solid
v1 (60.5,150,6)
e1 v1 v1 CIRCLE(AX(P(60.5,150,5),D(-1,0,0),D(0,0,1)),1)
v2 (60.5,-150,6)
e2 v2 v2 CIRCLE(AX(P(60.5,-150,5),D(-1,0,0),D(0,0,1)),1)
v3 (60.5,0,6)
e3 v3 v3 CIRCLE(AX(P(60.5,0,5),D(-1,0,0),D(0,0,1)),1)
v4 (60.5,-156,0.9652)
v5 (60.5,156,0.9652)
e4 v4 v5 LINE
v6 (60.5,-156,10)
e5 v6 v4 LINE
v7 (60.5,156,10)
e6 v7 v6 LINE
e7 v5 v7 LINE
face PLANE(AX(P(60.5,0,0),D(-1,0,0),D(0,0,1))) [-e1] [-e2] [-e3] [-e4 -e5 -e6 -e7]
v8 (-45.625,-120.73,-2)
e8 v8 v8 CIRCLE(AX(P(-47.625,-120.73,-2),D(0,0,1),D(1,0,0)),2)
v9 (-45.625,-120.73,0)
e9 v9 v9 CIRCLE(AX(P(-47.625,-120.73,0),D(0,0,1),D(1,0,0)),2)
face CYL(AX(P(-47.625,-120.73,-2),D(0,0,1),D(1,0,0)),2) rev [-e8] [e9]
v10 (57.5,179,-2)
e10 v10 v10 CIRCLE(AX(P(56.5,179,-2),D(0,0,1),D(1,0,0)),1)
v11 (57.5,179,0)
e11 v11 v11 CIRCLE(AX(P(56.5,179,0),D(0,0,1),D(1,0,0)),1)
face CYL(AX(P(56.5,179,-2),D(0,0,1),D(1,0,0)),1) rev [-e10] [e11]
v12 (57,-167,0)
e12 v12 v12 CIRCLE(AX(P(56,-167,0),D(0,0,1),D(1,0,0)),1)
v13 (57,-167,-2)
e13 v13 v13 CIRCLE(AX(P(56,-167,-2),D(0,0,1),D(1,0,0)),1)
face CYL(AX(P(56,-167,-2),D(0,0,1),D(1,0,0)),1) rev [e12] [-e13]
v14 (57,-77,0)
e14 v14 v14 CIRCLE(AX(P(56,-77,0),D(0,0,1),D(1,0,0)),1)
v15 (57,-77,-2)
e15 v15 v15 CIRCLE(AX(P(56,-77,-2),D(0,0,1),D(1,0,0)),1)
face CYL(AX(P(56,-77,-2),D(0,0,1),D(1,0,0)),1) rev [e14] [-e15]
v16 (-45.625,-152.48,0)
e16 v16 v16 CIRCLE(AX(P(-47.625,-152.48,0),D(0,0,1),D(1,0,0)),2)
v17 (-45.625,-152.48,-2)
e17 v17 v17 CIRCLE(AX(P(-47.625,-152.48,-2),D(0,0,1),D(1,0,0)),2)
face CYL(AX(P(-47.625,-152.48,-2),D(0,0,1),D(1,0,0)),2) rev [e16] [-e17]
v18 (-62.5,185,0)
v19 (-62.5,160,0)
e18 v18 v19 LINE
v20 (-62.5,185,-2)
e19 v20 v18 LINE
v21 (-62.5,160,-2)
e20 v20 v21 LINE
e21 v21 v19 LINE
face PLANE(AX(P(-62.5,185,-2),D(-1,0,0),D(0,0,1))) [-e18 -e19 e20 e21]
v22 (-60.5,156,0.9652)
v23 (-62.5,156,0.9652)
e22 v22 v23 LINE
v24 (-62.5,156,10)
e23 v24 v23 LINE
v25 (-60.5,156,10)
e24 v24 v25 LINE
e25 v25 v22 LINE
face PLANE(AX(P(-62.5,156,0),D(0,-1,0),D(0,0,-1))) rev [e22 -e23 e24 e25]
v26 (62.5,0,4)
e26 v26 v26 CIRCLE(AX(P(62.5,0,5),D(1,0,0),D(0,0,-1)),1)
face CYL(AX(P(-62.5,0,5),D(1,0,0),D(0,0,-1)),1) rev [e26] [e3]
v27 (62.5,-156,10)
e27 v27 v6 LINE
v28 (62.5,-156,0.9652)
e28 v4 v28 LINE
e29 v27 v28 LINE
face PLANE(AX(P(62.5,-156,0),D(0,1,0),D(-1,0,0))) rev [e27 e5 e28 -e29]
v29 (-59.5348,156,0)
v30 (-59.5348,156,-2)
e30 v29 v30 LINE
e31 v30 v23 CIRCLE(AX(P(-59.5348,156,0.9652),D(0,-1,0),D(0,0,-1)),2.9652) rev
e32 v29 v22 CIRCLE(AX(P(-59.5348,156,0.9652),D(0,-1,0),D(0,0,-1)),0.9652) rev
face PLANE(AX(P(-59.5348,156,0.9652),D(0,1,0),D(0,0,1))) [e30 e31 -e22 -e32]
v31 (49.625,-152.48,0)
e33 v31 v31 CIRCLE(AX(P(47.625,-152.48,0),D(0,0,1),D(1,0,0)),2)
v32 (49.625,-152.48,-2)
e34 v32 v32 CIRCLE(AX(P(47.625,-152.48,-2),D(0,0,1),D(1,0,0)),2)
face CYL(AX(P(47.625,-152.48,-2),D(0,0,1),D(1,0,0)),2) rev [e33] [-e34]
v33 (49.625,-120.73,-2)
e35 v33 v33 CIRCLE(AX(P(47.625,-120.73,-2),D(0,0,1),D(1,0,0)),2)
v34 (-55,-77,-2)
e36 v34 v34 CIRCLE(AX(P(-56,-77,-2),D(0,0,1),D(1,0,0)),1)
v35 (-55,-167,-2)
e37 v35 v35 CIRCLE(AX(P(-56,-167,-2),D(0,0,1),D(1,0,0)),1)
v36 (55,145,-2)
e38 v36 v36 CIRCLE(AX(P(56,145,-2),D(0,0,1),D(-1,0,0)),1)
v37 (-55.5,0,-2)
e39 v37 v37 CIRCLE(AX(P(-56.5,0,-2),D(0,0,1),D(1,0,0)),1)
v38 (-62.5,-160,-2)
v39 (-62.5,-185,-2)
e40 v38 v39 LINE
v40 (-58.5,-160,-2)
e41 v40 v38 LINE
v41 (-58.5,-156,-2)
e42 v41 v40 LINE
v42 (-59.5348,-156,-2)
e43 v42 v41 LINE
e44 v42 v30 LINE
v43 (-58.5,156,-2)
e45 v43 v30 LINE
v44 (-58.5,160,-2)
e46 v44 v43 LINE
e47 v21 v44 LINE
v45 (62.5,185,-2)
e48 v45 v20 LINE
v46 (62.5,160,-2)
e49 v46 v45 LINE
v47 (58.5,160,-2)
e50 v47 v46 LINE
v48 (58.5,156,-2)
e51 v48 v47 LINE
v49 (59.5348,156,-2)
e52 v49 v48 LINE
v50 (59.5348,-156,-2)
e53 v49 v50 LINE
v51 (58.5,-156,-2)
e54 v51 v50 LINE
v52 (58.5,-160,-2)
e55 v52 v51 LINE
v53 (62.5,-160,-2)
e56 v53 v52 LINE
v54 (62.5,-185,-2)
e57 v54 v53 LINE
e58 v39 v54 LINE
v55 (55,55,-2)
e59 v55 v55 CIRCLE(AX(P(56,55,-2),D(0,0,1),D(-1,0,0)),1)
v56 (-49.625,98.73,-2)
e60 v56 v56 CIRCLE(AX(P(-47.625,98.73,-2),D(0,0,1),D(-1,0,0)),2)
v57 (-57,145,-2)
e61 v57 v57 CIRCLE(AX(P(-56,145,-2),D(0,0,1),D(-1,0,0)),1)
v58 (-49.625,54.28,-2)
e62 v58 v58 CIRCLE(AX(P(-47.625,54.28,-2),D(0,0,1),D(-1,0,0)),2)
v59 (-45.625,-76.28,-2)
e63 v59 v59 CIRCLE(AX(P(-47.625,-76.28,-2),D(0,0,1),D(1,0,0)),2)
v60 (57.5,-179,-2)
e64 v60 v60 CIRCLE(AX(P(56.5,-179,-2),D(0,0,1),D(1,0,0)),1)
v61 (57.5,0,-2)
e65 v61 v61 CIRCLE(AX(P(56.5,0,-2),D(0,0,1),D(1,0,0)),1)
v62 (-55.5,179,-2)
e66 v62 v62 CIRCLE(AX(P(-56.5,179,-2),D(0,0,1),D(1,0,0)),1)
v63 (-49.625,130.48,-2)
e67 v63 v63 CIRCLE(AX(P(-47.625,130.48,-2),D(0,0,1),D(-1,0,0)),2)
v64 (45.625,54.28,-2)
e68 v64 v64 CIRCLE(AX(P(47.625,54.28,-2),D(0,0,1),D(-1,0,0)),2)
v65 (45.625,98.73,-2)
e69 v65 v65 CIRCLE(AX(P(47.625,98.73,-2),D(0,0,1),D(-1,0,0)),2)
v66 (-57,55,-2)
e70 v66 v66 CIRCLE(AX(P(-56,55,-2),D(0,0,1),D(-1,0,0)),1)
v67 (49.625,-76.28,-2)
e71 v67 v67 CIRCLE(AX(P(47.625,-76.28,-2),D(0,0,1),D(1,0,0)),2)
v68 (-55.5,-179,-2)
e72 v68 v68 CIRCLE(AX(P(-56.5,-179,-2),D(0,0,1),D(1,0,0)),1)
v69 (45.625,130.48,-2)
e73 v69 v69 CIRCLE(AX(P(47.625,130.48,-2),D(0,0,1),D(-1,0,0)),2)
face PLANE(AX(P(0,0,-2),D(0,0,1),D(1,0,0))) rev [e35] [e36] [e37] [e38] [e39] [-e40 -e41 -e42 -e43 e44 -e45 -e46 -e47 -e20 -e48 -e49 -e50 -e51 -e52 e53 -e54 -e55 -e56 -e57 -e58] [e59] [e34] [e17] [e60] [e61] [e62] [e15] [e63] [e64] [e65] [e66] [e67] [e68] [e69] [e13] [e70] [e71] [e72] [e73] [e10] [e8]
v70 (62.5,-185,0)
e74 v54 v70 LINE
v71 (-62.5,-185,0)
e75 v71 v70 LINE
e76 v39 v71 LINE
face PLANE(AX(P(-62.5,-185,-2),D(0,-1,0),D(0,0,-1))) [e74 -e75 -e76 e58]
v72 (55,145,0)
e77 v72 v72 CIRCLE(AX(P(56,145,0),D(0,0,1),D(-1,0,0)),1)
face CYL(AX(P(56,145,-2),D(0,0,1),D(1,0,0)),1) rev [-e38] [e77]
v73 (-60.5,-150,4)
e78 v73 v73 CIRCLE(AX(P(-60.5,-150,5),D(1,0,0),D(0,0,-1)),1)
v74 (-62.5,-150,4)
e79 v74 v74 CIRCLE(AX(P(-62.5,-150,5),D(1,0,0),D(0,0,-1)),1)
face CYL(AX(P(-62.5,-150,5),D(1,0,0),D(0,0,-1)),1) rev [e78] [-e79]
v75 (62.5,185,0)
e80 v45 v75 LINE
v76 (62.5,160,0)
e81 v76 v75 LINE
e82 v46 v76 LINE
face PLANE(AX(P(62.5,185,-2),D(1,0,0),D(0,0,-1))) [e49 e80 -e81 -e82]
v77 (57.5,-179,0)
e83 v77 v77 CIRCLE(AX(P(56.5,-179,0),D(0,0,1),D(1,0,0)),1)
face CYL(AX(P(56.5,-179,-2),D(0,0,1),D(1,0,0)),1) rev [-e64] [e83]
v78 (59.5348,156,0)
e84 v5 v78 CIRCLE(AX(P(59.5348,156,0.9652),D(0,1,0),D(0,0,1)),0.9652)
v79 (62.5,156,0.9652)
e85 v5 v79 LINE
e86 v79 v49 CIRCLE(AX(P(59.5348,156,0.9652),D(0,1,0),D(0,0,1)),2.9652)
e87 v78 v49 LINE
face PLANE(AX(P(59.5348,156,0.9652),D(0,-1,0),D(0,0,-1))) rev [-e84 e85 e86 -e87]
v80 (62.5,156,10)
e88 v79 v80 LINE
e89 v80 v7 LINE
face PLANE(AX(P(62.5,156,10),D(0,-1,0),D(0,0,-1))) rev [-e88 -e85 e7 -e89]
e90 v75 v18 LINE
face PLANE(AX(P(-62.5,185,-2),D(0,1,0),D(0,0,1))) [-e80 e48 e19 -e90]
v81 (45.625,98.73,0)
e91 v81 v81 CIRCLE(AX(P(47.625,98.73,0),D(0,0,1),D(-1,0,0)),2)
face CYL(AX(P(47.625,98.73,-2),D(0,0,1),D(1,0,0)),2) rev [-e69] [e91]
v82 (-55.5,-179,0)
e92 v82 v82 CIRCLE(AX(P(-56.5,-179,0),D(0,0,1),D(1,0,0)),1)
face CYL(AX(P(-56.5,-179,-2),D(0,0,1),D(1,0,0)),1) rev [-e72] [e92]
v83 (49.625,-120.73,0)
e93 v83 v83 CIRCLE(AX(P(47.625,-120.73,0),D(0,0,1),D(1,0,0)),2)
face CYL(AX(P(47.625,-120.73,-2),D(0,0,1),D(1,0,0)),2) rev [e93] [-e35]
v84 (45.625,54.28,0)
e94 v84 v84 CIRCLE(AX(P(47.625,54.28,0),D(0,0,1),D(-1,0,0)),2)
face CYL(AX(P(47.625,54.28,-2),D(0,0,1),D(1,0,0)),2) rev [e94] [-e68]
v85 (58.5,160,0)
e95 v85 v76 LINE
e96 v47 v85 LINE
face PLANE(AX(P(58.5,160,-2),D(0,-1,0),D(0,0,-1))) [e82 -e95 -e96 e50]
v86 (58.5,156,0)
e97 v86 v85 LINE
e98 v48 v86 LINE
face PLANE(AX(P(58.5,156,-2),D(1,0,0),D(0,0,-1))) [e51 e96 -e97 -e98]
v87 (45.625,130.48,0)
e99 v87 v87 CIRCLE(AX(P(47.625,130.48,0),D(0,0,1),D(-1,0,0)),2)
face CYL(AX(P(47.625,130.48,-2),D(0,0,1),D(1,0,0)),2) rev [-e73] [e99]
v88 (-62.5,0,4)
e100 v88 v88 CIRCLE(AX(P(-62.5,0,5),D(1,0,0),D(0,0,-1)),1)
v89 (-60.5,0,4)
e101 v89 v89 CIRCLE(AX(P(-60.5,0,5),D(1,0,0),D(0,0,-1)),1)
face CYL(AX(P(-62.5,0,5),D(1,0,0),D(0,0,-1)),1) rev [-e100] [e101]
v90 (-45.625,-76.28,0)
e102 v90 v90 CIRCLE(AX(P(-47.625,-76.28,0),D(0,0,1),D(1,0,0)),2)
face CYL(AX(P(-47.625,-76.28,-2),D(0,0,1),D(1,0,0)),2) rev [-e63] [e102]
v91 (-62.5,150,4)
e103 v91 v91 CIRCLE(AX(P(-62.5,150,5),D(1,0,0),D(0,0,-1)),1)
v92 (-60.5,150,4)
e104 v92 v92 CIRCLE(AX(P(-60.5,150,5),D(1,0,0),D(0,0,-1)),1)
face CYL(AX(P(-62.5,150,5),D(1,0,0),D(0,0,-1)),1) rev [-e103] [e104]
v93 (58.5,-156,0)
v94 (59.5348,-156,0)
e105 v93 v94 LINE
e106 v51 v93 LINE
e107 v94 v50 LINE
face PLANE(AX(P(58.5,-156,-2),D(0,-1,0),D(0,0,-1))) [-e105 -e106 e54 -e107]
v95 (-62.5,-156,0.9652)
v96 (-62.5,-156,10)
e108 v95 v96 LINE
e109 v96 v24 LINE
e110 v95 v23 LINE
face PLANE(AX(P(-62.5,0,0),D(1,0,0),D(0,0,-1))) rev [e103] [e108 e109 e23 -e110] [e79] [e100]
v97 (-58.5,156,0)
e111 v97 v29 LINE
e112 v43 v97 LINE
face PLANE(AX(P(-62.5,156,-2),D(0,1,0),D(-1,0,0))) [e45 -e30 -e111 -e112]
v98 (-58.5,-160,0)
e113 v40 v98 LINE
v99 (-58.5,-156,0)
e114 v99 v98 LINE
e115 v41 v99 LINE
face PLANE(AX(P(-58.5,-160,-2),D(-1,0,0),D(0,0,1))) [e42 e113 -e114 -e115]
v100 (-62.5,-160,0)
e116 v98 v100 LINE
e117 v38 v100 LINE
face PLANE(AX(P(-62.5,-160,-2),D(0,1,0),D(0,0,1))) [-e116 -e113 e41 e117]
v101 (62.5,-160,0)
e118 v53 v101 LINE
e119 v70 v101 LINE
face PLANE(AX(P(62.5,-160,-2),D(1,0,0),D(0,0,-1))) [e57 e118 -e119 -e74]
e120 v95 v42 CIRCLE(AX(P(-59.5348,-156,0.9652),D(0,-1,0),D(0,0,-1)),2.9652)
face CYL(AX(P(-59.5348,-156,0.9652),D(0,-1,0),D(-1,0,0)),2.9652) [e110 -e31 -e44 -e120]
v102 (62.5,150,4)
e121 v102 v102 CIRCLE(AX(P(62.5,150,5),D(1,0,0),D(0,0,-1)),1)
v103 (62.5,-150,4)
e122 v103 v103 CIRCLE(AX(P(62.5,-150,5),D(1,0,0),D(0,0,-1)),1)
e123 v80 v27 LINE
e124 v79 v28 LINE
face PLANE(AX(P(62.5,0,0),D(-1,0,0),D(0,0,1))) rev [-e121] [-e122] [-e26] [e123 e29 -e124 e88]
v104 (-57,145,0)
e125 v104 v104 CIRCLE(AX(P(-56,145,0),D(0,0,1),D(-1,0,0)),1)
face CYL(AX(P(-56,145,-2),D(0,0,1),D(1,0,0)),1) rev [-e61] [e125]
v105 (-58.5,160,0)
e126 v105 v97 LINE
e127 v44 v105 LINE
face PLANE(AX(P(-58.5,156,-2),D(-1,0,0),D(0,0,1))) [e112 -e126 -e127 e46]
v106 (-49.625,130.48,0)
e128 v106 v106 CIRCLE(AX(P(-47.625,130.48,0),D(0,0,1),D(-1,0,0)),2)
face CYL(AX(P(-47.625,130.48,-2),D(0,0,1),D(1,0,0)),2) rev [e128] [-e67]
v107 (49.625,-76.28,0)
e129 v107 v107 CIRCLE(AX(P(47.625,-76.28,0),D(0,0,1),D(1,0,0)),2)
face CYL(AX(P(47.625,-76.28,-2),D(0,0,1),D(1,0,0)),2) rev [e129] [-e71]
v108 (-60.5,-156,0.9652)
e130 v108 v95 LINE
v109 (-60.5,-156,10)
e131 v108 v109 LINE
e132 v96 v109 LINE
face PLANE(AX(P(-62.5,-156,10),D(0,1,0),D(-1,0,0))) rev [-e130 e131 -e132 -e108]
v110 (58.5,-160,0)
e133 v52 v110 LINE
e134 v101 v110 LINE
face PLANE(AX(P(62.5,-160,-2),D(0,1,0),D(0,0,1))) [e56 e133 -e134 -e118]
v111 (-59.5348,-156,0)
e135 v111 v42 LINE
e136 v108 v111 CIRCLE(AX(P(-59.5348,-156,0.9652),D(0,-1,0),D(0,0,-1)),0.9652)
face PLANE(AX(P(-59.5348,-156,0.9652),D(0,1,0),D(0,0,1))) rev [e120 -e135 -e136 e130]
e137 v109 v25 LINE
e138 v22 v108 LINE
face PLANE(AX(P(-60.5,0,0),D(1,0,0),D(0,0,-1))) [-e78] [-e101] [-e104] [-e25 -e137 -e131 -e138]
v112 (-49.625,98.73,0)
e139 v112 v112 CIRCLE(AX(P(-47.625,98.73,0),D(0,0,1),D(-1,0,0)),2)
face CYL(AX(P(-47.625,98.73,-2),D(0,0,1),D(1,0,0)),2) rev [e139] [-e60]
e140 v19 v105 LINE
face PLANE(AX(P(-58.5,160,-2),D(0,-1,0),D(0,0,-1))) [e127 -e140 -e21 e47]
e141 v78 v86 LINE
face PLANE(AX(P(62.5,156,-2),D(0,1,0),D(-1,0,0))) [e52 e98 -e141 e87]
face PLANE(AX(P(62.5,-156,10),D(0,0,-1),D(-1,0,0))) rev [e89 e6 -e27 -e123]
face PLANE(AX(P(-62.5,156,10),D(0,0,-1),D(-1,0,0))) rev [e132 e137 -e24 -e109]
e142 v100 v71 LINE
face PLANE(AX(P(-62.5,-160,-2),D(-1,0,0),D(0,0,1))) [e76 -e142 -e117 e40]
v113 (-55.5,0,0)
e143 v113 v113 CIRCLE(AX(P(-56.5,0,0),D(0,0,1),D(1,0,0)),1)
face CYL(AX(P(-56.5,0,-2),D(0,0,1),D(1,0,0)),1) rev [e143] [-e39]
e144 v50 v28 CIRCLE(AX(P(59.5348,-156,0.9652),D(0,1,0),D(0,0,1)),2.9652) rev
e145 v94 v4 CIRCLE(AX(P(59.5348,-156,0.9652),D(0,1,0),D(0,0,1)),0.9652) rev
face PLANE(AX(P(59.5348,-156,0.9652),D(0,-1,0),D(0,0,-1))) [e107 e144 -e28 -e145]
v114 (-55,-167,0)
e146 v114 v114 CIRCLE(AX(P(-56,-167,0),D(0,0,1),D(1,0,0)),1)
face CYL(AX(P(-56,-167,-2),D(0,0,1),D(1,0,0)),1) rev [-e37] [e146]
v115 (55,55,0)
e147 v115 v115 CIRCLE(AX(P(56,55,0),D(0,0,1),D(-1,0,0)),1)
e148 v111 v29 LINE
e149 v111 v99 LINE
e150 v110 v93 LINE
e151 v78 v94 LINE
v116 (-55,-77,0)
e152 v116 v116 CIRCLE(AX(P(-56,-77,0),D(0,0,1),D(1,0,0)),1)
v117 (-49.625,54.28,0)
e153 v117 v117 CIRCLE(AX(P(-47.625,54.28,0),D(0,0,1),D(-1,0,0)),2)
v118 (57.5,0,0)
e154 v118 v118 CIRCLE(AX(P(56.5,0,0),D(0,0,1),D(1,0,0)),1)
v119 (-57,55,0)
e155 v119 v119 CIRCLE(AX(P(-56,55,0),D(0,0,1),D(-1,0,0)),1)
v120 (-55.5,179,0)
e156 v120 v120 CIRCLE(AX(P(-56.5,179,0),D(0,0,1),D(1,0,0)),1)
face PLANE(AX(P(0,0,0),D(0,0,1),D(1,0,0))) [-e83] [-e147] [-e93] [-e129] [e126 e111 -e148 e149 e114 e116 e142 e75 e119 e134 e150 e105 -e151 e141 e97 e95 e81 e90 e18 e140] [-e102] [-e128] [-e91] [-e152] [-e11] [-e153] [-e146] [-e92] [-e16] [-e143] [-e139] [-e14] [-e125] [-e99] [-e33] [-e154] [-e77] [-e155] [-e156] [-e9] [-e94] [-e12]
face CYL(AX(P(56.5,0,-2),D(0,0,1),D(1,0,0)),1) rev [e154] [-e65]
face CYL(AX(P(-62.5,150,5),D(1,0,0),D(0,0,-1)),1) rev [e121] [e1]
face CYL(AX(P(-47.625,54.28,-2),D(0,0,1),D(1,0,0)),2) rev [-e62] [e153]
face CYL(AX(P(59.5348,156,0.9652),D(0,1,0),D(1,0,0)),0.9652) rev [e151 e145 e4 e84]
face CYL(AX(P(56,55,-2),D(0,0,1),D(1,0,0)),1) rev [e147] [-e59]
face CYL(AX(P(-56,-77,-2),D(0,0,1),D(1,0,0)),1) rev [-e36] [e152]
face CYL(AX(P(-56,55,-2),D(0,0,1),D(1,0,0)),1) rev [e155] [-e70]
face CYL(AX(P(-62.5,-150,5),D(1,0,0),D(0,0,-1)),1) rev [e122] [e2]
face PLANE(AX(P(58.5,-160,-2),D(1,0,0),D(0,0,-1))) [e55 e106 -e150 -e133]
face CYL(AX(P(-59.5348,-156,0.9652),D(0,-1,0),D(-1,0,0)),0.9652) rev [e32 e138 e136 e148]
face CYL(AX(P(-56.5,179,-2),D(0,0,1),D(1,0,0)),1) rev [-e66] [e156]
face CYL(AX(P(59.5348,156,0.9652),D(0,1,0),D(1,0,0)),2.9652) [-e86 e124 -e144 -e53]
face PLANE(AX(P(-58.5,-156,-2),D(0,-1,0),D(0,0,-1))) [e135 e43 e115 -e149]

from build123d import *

# Parameters (mm, degrees)
SKETCH1_R                      = 2
SKETCH1_R_2                    = 1
BASE_FLANGE1_DEPTH             = 2
EDGE_FLANGE1_STRIP_W           = 9.9304
EDGE_FLANGE1_STRIP_H           = 2
EDGE_FLANGE1_STRIP_CUT_DEPTH   = 312
EDGE_FLANGE1_STRIP_2_W         = 9.9304
EDGE_FLANGE1_STRIP_2_H         = 2
EDGE_FLANGE1_STRIP_CUT_2_DEPTH = 312
EDGE_FLANGE1_DEPTH             = 312
EDGE_FLANGE1_BEND_DEPTH        = 312
SKETCH13_R                     = 1
CUT_EXTRUDE1_DEPTH             = 224.494966386


# Sheet-metal steps are written as plain solids
with BuildPart() as part:
    # Sketch1 → Base-Flange1 (new body)
    with BuildSketch(Plane(origin=(0, 0, 0), x_dir=(0, 1, 0), z_dir=(0, 0, 1))):
        Polygon((185, 62.5), (160, 62.5), (160, 58.5), (156, 58.5), (156, 62.5), (-156, 62.5), (-156, 58.5), (-160, 58.5), (-160, 62.5), (-185, 62.5), (-185, -62.5), (-160, -62.5), (-160, -58.5), (-156, -58.5), (-156, -62.5), (156, -62.5), (156, -58.5), (160, -58.5), (160, -62.5), (185, -62.5), align=None)
        with Locations(Location((-152.48, 47.625, 0), (0, 0, 270))):
            Circle(SKETCH1_R, mode=Mode.SUBTRACT)
        with Locations(Location((-120.73, 47.625, 0), (0, 0, 270))):
            Circle(SKETCH1_R, mode=Mode.SUBTRACT)
        with Locations(Location((-76.28, 47.625, 0), (0, 0, 270))):
            Circle(SKETCH1_R, mode=Mode.SUBTRACT)
        with Locations(Location((-152.48, -47.625, 0), (0, 0, 270))):
            Circle(SKETCH1_R, mode=Mode.SUBTRACT)
        with Locations(Location((-120.73, -47.625, 0), (0, 0, 270))):
            Circle(SKETCH1_R, mode=Mode.SUBTRACT)
        with Locations(Location((-76.28, -47.625, 0), (0, 0, 270))):
            Circle(SKETCH1_R, mode=Mode.SUBTRACT)
        with Locations(Location((54.28, 47.625, 0), (0, 0, 90))):
            Circle(SKETCH1_R, mode=Mode.SUBTRACT)
        with Locations(Location((98.73, 47.625, 0), (0, 0, 90))):
            Circle(SKETCH1_R, mode=Mode.SUBTRACT)
        with Locations(Location((130.48, 47.625, 0), (0, 0, 90))):
            Circle(SKETCH1_R, mode=Mode.SUBTRACT)
        with Locations(Location((130.48, -47.625, 0), (0, 0, 90))):
            Circle(SKETCH1_R, mode=Mode.SUBTRACT)
        with Locations(Location((98.73, -47.625, 0), (0, 0, 90))):
            Circle(SKETCH1_R, mode=Mode.SUBTRACT)
        with Locations(Location((54.28, -47.625, 0), (0, 0, 90))):
            Circle(SKETCH1_R, mode=Mode.SUBTRACT)
        with Locations(Location((-179, 56.5, 0), (0, 0, 270))):
            Circle(SKETCH1_R_2, mode=Mode.SUBTRACT)
        with Locations(Location((-179, -56.5, 0), (0, 0, 270))):
            Circle(SKETCH1_R_2, mode=Mode.SUBTRACT)
        with Locations(Location((179, -56.5, 0), (0, 0, 270))):
            Circle(SKETCH1_R_2, mode=Mode.SUBTRACT)
        with Locations(Location((179, 56.5, 0), (0, 0, 270))):
            Circle(SKETCH1_R_2, mode=Mode.SUBTRACT)
        with Locations(Location((0, 56.5, 0), (0, 0, 270))):
            Circle(SKETCH1_R_2, mode=Mode.SUBTRACT)
        with Locations(Location((0, -56.5, 0), (0, 0, 270))):
            Circle(SKETCH1_R_2, mode=Mode.SUBTRACT)
        with Locations(Location((-167, 56, 0), (0, 0, 270))):
            Circle(SKETCH1_R_2, mode=Mode.SUBTRACT)
        with Locations(Location((-77, 56, 0), (0, 0, 270))):
            Circle(SKETCH1_R_2, mode=Mode.SUBTRACT)
        with Locations(Location((-167, -56, 0), (0, 0, 270))):
            Circle(SKETCH1_R_2, mode=Mode.SUBTRACT)
        with Locations(Location((-77, -56, 0), (0, 0, 270))):
            Circle(SKETCH1_R_2, mode=Mode.SUBTRACT)
        with Locations(Location((55, -56, 0), (0, 0, 90))):
            Circle(SKETCH1_R_2, mode=Mode.SUBTRACT)
        with Locations(Location((145, -56, 0), (0, 0, 90))):
            Circle(SKETCH1_R_2, mode=Mode.SUBTRACT)
        with Locations(Location((55, 56, 0), (0, 0, 90))):
            Circle(SKETCH1_R_2, mode=Mode.SUBTRACT)
        with Locations(Location((145, 56, 0), (0, 0, 90))):
            Circle(SKETCH1_R_2, mode=Mode.SUBTRACT)
    extrude(amount=-BASE_FLANGE1_DEPTH)

    # Edge-Flange1 strip (across the edge) → Edge-Flange1 strip cut (cut)
    with BuildSketch(Plane(origin=(-62.5, 156, 0), x_dir=(1, 0, 0), z_dir=(0, -1, 0))):
        with Locations((-2, -1)):
            Rectangle(EDGE_FLANGE1_STRIP_W, EDGE_FLANGE1_STRIP_H)
    extrude(amount=EDGE_FLANGE1_STRIP_CUT_DEPTH, mode=Mode.SUBTRACT)

    # Edge-Flange1 strip 2 (across the edge) → Edge-Flange1 strip cut 2 (cut)
    with BuildSketch(Plane(origin=(62.5, -156, 0), x_dir=(-1, 0, 0), z_dir=(0, 1, 0))):
        with Locations((-2, -1)):
            Rectangle(EDGE_FLANGE1_STRIP_2_W, EDGE_FLANGE1_STRIP_2_H)
    extrude(amount=EDGE_FLANGE1_STRIP_CUT_2_DEPTH, mode=Mode.SUBTRACT)

    # Edge-Flange1 section (across the edge) → Edge-Flange1 (add)
    with BuildSketch(Plane(origin=(-62.5, 156, 0), x_dir=(1, 0, 0), z_dir=(0, -1, 0))):
        with BuildLine():
            Line((0, 0.9652), (0, 10))
            Line((0, 10), (2, 10))
            Line((2, 10), (2, 0.9652))
            ThreePointArc((2, 0.9652), (2.282700535, 0.282700535), (2.9652, 0))
            Line((2.9652, 0), (2.9652, -2))
            ThreePointArc((2.9652, -2), (0.868486972, -1.131513028), (0, 0.9652))
        make_face()
    extrude(amount=EDGE_FLANGE1_DEPTH)

    # Edge-Flange1 section 2 (across the edge) → Edge-Flange1 bend (add)
    with BuildSketch(Plane(origin=(62.5, -156, 0), x_dir=(-1, 0, 0), z_dir=(0, 1, 0))):
        with BuildLine():
            Line((0, 0.9652), (0, 10))
            Line((0, 10), (2, 10))
            Line((2, 10), (2, 0.9652))
            ThreePointArc((2, 0.9652), (2.282700535, 0.282700535), (2.9652, 0))
            Line((2.9652, 0), (2.9652, -2))
            ThreePointArc((2.9652, -2), (0.868486972, -1.131513028), (0, 0.9652))
        make_face()
    extrude(amount=EDGE_FLANGE1_BEND_DEPTH)

    # Sketch13 → Cut-Extrude1 (cut, through all)
    with BuildSketch(Plane.YZ.offset(62.5)):
        with Locations(Location((0, 5, 0), (0, 0, 270))):
            Circle(SKETCH13_R)
        with Locations(Location((150, 5, 0), (0, 0, 270))):
            Circle(SKETCH13_R)
        with Locations(Location((-150, 5, 0), (0, 0, 270))):
            Circle(SKETCH13_R)
    extrude(amount=-CUT_EXTRUDE1_DEPTH, mode=Mode.SUBTRACT)


solid = part.part
